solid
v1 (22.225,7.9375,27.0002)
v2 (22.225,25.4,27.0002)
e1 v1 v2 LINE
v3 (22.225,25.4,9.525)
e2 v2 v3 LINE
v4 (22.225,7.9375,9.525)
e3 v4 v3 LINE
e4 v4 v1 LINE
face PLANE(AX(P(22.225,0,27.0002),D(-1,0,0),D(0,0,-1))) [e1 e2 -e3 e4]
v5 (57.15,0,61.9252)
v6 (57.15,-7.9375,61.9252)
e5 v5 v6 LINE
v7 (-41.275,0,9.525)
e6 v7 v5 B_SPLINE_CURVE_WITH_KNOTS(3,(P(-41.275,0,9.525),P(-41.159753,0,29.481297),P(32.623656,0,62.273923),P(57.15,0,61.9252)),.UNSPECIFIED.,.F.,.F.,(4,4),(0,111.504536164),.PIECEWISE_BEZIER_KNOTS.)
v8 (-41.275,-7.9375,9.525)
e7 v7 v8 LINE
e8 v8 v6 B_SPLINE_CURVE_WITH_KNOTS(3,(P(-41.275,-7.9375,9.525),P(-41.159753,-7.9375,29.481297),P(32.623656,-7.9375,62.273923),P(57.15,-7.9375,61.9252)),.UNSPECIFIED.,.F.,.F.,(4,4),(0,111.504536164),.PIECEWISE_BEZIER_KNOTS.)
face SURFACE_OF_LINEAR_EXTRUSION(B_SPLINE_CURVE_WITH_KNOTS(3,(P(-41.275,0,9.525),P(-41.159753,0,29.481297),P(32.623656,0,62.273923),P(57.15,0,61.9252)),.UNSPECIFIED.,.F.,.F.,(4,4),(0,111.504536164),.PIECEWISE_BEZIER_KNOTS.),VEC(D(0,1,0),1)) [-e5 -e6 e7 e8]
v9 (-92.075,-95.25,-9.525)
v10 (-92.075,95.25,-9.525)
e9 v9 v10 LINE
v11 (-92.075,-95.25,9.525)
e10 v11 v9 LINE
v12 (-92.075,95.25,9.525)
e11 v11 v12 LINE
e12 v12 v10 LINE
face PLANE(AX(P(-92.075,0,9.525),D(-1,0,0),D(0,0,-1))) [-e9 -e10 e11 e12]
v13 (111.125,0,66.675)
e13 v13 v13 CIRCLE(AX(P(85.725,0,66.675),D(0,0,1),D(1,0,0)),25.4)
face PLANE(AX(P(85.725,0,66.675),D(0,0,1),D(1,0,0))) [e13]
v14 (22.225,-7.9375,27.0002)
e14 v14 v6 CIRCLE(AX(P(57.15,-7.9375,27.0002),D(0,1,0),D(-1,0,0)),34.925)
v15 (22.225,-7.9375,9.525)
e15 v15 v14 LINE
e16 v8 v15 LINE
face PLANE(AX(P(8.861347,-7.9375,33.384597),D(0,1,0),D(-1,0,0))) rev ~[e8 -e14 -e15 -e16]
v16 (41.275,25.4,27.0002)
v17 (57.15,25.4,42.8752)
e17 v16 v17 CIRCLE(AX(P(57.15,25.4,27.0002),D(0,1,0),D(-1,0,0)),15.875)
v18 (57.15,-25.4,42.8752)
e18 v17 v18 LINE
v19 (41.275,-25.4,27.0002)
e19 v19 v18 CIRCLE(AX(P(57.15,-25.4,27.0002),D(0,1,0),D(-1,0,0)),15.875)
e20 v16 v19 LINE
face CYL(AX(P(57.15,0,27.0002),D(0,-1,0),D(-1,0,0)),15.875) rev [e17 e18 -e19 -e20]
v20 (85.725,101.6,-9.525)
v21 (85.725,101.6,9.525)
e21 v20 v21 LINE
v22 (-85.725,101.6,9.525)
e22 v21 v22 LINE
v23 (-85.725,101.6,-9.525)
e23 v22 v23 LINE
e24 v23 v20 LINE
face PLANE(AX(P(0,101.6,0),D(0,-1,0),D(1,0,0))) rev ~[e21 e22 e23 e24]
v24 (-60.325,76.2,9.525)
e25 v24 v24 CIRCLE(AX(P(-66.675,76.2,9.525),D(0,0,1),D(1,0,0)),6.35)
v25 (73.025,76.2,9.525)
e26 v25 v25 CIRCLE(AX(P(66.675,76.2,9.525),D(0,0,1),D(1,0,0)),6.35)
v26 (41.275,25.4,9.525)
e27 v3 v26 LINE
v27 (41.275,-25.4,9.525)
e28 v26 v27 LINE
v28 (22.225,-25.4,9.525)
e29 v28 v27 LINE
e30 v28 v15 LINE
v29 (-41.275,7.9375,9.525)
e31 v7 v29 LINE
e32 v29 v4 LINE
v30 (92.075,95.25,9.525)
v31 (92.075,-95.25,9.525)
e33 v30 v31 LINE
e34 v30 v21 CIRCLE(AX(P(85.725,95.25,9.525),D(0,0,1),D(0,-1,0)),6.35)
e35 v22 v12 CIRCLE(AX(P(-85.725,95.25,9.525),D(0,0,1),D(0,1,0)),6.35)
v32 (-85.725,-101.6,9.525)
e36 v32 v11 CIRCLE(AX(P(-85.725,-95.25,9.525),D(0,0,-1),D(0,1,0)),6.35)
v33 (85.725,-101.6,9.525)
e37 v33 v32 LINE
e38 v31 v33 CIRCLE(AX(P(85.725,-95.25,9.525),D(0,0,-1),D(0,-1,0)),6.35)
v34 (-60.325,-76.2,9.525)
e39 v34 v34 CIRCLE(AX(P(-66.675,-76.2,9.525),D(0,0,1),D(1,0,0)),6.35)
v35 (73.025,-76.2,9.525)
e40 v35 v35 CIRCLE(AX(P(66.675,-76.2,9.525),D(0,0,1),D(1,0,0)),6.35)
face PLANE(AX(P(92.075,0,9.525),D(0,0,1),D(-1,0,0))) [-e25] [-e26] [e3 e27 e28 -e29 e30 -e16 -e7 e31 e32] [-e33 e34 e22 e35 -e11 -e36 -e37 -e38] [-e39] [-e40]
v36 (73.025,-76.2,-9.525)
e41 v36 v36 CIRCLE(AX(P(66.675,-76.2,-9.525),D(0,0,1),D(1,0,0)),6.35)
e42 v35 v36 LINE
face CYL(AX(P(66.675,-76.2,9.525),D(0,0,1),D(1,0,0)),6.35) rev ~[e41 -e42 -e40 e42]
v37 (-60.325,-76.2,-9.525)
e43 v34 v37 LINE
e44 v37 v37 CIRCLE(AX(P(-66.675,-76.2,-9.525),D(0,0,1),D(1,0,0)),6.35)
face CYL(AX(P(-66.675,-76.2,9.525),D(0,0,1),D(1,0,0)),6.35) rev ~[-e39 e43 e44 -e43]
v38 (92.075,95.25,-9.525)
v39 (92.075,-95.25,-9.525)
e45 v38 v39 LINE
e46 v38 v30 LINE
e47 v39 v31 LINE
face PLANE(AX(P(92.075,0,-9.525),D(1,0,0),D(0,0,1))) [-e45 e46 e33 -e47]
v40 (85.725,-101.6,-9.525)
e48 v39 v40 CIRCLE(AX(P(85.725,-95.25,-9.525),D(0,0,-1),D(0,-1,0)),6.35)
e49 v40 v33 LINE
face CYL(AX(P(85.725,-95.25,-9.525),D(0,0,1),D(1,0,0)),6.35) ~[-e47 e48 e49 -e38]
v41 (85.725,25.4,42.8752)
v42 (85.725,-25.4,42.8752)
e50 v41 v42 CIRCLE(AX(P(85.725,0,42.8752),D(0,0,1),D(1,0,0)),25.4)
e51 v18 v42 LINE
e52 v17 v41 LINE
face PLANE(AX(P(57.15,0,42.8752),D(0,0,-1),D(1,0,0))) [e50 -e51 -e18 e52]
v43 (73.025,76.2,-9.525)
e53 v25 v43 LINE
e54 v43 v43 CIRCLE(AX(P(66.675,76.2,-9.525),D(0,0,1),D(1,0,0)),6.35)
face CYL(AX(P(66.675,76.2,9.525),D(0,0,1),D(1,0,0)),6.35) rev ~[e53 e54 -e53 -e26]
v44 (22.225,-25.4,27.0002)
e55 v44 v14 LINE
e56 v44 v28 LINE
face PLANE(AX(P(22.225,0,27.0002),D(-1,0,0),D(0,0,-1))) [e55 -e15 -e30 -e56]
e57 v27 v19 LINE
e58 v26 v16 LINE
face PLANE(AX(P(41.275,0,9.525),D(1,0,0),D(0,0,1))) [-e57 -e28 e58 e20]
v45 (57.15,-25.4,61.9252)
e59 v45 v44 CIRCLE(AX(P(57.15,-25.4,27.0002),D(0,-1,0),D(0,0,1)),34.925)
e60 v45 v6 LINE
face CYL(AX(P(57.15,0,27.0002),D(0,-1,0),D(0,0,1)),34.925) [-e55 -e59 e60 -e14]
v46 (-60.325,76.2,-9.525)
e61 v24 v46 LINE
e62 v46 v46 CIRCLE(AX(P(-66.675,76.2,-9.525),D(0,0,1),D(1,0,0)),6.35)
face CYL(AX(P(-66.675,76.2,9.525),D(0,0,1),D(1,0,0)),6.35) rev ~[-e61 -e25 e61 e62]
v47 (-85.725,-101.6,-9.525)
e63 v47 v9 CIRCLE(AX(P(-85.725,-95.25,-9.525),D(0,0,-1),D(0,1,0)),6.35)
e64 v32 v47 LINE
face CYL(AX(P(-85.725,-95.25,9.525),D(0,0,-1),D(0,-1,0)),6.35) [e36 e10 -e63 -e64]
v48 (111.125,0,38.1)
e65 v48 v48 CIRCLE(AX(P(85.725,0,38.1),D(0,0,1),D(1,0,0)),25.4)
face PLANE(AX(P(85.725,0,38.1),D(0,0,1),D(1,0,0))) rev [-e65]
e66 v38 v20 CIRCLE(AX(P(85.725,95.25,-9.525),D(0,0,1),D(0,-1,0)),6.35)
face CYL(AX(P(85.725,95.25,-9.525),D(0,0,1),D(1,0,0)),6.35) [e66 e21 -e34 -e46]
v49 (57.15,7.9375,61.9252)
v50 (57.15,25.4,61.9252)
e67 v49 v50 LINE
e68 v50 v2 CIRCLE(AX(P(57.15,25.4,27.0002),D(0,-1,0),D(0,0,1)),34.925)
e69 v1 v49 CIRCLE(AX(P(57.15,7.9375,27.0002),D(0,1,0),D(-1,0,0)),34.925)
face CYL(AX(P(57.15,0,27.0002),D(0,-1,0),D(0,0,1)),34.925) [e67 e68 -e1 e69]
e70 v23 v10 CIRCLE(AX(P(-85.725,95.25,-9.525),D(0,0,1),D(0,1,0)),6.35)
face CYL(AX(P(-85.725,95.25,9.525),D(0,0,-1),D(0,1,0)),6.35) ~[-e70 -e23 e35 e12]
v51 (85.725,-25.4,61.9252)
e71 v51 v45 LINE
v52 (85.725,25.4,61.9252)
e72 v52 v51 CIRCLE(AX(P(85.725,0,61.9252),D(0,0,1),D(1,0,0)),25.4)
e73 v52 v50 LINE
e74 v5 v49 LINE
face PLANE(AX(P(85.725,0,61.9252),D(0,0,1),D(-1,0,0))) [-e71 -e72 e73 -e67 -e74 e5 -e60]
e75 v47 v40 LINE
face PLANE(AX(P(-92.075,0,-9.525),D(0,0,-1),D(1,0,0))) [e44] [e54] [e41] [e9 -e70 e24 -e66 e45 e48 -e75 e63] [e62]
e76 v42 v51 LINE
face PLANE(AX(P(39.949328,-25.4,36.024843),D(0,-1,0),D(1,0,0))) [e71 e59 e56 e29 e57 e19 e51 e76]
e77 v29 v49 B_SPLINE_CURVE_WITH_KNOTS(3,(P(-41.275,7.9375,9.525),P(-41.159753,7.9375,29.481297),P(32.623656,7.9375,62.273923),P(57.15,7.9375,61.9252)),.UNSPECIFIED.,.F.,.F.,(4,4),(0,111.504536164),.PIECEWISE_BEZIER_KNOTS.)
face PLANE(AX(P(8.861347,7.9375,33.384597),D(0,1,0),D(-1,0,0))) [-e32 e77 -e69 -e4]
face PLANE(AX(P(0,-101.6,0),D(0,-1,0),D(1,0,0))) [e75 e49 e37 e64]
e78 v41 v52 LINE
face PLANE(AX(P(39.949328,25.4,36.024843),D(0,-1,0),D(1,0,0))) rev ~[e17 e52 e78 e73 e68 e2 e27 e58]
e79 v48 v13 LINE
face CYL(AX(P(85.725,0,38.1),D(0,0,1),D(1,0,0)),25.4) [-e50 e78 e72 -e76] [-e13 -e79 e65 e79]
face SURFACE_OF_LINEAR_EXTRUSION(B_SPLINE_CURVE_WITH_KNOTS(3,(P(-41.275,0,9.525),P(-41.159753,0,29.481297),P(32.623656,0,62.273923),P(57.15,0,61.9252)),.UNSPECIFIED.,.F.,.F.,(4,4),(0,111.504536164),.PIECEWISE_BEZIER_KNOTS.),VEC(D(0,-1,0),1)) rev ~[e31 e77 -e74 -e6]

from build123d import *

# Parameters (mm, degrees)
F1_DEPTH = 101.6
F0_W     = 25.4
F0_H     = 19.05
F2_DEPTH = 25.4
F3_DEPTH = 7.9375
F5_R     = 6.35
F6_R     = 6.35
F7_DEPTH = 19.051


# Not quite as in the source:
# - a feature names something its author has since deleted; it is built from what else it names


with BuildPart() as f1:
    # F0 (on Front) → F1 (new body, symmetric)
    with BuildSketch(Plane.XZ):
        Polygon((-92.075, -9.525), (-41.275, -9.525), (41.275, -9.525), (92.075, -9.525), (92.075, 9.525), (41.275, 9.525), (22.225, 9.525), (-41.275, 9.525), (-92.075, 9.525), align=None)
    extrude(amount=F1_DEPTH, both=True)

    # F0 (on Front) → F2 (join, symmetric)
    with BuildSketch(Plane.XZ):
        with BuildLine():
            Line((22.225, 9.525), (41.275, 9.525))
            Line((41.275, 9.525), (41.275, 27.0002))
            ThreePointArc((41.275, 27.0002), (45.9246798487, 38.2255201513), (57.15, 42.8752))
            Line((57.15, 42.8752), (60.325, 42.8752))
            Line((60.325, 42.8752), (60.325, 61.9252))
            Line((60.325, 61.9252), (57.15, 61.9252))
            ThreePointArc((57.15, 61.9252), (32.4542956671, 51.6959043329), (22.225, 27.0002))
            Line((22.225, 27.0002), (22.225, 9.525))
        make_face()
        with Locations((73.025, 52.4002)):
            Rectangle(F0_W, F0_H)
    extrude(amount=F2_DEPTH, both=True)

    # F0 (on Front) → F3 (join, symmetric)
    with BuildSketch(Plane.XZ):
        with BuildLine():
            add(Edge.make_bspline(
                [(-41.275, 9.525), (-41.1597527564, 29.4812973589), (32.6236560941, 62.2739233077), (57.15, 61.9252)],
                knots=[0, 0, 0, 0, 111.5045361635, 111.5045361635, 111.5045361635, 111.5045361635], degree=3))
            Line((-41.275, 9.525), (22.225, 9.525))
            Line((22.225, 9.525), (22.225, 27.0002))
            ThreePointArc((22.225, 27.0002), (32.4542956671, 51.6959043329), (57.15, 61.9252))
        make_face()
    extrude(amount=F3_DEPTH, both=True)

    # F0 (on Front) → F4 (revolve)
    with BuildSketch(Plane.XZ):
        Polygon((85.725, 66.675), (85.725, 61.9252), (85.725, 42.8752), (85.725, 38.1), (111.125, 38.1), (111.125, 66.675), align=None)
    revolve(axis=Axis((85.725, 0, 52.3875), (0, 0, 1)))

    # F5
    f5_edges = [f1.edges().sort_by_distance(p)[0] for p in [
        (-92.075, -101.6, 0),
        (92.075, -101.6, 0),
        (92.075, 101.6, 0),
        (-92.075, 101.6, 0),
    ]]
    fillet(f5_edges, radius=F5_R)

    # F6 (on face) → F7 (cut, through all)
    with BuildSketch(Plane.XY.offset(9.525)):
        with Locations((66.675, 76.2)):
            Circle(F6_R)
        with Locations((66.675, -76.2)):
            Circle(F6_R)
        with Locations((-66.675, 76.2)):
            Circle(F6_R)
        with Locations((-66.675, -76.2)):
            Circle(F6_R)
    extrude(amount=-F7_DEPTH, mode=Mode.SUBTRACT)


solid = f1.part
